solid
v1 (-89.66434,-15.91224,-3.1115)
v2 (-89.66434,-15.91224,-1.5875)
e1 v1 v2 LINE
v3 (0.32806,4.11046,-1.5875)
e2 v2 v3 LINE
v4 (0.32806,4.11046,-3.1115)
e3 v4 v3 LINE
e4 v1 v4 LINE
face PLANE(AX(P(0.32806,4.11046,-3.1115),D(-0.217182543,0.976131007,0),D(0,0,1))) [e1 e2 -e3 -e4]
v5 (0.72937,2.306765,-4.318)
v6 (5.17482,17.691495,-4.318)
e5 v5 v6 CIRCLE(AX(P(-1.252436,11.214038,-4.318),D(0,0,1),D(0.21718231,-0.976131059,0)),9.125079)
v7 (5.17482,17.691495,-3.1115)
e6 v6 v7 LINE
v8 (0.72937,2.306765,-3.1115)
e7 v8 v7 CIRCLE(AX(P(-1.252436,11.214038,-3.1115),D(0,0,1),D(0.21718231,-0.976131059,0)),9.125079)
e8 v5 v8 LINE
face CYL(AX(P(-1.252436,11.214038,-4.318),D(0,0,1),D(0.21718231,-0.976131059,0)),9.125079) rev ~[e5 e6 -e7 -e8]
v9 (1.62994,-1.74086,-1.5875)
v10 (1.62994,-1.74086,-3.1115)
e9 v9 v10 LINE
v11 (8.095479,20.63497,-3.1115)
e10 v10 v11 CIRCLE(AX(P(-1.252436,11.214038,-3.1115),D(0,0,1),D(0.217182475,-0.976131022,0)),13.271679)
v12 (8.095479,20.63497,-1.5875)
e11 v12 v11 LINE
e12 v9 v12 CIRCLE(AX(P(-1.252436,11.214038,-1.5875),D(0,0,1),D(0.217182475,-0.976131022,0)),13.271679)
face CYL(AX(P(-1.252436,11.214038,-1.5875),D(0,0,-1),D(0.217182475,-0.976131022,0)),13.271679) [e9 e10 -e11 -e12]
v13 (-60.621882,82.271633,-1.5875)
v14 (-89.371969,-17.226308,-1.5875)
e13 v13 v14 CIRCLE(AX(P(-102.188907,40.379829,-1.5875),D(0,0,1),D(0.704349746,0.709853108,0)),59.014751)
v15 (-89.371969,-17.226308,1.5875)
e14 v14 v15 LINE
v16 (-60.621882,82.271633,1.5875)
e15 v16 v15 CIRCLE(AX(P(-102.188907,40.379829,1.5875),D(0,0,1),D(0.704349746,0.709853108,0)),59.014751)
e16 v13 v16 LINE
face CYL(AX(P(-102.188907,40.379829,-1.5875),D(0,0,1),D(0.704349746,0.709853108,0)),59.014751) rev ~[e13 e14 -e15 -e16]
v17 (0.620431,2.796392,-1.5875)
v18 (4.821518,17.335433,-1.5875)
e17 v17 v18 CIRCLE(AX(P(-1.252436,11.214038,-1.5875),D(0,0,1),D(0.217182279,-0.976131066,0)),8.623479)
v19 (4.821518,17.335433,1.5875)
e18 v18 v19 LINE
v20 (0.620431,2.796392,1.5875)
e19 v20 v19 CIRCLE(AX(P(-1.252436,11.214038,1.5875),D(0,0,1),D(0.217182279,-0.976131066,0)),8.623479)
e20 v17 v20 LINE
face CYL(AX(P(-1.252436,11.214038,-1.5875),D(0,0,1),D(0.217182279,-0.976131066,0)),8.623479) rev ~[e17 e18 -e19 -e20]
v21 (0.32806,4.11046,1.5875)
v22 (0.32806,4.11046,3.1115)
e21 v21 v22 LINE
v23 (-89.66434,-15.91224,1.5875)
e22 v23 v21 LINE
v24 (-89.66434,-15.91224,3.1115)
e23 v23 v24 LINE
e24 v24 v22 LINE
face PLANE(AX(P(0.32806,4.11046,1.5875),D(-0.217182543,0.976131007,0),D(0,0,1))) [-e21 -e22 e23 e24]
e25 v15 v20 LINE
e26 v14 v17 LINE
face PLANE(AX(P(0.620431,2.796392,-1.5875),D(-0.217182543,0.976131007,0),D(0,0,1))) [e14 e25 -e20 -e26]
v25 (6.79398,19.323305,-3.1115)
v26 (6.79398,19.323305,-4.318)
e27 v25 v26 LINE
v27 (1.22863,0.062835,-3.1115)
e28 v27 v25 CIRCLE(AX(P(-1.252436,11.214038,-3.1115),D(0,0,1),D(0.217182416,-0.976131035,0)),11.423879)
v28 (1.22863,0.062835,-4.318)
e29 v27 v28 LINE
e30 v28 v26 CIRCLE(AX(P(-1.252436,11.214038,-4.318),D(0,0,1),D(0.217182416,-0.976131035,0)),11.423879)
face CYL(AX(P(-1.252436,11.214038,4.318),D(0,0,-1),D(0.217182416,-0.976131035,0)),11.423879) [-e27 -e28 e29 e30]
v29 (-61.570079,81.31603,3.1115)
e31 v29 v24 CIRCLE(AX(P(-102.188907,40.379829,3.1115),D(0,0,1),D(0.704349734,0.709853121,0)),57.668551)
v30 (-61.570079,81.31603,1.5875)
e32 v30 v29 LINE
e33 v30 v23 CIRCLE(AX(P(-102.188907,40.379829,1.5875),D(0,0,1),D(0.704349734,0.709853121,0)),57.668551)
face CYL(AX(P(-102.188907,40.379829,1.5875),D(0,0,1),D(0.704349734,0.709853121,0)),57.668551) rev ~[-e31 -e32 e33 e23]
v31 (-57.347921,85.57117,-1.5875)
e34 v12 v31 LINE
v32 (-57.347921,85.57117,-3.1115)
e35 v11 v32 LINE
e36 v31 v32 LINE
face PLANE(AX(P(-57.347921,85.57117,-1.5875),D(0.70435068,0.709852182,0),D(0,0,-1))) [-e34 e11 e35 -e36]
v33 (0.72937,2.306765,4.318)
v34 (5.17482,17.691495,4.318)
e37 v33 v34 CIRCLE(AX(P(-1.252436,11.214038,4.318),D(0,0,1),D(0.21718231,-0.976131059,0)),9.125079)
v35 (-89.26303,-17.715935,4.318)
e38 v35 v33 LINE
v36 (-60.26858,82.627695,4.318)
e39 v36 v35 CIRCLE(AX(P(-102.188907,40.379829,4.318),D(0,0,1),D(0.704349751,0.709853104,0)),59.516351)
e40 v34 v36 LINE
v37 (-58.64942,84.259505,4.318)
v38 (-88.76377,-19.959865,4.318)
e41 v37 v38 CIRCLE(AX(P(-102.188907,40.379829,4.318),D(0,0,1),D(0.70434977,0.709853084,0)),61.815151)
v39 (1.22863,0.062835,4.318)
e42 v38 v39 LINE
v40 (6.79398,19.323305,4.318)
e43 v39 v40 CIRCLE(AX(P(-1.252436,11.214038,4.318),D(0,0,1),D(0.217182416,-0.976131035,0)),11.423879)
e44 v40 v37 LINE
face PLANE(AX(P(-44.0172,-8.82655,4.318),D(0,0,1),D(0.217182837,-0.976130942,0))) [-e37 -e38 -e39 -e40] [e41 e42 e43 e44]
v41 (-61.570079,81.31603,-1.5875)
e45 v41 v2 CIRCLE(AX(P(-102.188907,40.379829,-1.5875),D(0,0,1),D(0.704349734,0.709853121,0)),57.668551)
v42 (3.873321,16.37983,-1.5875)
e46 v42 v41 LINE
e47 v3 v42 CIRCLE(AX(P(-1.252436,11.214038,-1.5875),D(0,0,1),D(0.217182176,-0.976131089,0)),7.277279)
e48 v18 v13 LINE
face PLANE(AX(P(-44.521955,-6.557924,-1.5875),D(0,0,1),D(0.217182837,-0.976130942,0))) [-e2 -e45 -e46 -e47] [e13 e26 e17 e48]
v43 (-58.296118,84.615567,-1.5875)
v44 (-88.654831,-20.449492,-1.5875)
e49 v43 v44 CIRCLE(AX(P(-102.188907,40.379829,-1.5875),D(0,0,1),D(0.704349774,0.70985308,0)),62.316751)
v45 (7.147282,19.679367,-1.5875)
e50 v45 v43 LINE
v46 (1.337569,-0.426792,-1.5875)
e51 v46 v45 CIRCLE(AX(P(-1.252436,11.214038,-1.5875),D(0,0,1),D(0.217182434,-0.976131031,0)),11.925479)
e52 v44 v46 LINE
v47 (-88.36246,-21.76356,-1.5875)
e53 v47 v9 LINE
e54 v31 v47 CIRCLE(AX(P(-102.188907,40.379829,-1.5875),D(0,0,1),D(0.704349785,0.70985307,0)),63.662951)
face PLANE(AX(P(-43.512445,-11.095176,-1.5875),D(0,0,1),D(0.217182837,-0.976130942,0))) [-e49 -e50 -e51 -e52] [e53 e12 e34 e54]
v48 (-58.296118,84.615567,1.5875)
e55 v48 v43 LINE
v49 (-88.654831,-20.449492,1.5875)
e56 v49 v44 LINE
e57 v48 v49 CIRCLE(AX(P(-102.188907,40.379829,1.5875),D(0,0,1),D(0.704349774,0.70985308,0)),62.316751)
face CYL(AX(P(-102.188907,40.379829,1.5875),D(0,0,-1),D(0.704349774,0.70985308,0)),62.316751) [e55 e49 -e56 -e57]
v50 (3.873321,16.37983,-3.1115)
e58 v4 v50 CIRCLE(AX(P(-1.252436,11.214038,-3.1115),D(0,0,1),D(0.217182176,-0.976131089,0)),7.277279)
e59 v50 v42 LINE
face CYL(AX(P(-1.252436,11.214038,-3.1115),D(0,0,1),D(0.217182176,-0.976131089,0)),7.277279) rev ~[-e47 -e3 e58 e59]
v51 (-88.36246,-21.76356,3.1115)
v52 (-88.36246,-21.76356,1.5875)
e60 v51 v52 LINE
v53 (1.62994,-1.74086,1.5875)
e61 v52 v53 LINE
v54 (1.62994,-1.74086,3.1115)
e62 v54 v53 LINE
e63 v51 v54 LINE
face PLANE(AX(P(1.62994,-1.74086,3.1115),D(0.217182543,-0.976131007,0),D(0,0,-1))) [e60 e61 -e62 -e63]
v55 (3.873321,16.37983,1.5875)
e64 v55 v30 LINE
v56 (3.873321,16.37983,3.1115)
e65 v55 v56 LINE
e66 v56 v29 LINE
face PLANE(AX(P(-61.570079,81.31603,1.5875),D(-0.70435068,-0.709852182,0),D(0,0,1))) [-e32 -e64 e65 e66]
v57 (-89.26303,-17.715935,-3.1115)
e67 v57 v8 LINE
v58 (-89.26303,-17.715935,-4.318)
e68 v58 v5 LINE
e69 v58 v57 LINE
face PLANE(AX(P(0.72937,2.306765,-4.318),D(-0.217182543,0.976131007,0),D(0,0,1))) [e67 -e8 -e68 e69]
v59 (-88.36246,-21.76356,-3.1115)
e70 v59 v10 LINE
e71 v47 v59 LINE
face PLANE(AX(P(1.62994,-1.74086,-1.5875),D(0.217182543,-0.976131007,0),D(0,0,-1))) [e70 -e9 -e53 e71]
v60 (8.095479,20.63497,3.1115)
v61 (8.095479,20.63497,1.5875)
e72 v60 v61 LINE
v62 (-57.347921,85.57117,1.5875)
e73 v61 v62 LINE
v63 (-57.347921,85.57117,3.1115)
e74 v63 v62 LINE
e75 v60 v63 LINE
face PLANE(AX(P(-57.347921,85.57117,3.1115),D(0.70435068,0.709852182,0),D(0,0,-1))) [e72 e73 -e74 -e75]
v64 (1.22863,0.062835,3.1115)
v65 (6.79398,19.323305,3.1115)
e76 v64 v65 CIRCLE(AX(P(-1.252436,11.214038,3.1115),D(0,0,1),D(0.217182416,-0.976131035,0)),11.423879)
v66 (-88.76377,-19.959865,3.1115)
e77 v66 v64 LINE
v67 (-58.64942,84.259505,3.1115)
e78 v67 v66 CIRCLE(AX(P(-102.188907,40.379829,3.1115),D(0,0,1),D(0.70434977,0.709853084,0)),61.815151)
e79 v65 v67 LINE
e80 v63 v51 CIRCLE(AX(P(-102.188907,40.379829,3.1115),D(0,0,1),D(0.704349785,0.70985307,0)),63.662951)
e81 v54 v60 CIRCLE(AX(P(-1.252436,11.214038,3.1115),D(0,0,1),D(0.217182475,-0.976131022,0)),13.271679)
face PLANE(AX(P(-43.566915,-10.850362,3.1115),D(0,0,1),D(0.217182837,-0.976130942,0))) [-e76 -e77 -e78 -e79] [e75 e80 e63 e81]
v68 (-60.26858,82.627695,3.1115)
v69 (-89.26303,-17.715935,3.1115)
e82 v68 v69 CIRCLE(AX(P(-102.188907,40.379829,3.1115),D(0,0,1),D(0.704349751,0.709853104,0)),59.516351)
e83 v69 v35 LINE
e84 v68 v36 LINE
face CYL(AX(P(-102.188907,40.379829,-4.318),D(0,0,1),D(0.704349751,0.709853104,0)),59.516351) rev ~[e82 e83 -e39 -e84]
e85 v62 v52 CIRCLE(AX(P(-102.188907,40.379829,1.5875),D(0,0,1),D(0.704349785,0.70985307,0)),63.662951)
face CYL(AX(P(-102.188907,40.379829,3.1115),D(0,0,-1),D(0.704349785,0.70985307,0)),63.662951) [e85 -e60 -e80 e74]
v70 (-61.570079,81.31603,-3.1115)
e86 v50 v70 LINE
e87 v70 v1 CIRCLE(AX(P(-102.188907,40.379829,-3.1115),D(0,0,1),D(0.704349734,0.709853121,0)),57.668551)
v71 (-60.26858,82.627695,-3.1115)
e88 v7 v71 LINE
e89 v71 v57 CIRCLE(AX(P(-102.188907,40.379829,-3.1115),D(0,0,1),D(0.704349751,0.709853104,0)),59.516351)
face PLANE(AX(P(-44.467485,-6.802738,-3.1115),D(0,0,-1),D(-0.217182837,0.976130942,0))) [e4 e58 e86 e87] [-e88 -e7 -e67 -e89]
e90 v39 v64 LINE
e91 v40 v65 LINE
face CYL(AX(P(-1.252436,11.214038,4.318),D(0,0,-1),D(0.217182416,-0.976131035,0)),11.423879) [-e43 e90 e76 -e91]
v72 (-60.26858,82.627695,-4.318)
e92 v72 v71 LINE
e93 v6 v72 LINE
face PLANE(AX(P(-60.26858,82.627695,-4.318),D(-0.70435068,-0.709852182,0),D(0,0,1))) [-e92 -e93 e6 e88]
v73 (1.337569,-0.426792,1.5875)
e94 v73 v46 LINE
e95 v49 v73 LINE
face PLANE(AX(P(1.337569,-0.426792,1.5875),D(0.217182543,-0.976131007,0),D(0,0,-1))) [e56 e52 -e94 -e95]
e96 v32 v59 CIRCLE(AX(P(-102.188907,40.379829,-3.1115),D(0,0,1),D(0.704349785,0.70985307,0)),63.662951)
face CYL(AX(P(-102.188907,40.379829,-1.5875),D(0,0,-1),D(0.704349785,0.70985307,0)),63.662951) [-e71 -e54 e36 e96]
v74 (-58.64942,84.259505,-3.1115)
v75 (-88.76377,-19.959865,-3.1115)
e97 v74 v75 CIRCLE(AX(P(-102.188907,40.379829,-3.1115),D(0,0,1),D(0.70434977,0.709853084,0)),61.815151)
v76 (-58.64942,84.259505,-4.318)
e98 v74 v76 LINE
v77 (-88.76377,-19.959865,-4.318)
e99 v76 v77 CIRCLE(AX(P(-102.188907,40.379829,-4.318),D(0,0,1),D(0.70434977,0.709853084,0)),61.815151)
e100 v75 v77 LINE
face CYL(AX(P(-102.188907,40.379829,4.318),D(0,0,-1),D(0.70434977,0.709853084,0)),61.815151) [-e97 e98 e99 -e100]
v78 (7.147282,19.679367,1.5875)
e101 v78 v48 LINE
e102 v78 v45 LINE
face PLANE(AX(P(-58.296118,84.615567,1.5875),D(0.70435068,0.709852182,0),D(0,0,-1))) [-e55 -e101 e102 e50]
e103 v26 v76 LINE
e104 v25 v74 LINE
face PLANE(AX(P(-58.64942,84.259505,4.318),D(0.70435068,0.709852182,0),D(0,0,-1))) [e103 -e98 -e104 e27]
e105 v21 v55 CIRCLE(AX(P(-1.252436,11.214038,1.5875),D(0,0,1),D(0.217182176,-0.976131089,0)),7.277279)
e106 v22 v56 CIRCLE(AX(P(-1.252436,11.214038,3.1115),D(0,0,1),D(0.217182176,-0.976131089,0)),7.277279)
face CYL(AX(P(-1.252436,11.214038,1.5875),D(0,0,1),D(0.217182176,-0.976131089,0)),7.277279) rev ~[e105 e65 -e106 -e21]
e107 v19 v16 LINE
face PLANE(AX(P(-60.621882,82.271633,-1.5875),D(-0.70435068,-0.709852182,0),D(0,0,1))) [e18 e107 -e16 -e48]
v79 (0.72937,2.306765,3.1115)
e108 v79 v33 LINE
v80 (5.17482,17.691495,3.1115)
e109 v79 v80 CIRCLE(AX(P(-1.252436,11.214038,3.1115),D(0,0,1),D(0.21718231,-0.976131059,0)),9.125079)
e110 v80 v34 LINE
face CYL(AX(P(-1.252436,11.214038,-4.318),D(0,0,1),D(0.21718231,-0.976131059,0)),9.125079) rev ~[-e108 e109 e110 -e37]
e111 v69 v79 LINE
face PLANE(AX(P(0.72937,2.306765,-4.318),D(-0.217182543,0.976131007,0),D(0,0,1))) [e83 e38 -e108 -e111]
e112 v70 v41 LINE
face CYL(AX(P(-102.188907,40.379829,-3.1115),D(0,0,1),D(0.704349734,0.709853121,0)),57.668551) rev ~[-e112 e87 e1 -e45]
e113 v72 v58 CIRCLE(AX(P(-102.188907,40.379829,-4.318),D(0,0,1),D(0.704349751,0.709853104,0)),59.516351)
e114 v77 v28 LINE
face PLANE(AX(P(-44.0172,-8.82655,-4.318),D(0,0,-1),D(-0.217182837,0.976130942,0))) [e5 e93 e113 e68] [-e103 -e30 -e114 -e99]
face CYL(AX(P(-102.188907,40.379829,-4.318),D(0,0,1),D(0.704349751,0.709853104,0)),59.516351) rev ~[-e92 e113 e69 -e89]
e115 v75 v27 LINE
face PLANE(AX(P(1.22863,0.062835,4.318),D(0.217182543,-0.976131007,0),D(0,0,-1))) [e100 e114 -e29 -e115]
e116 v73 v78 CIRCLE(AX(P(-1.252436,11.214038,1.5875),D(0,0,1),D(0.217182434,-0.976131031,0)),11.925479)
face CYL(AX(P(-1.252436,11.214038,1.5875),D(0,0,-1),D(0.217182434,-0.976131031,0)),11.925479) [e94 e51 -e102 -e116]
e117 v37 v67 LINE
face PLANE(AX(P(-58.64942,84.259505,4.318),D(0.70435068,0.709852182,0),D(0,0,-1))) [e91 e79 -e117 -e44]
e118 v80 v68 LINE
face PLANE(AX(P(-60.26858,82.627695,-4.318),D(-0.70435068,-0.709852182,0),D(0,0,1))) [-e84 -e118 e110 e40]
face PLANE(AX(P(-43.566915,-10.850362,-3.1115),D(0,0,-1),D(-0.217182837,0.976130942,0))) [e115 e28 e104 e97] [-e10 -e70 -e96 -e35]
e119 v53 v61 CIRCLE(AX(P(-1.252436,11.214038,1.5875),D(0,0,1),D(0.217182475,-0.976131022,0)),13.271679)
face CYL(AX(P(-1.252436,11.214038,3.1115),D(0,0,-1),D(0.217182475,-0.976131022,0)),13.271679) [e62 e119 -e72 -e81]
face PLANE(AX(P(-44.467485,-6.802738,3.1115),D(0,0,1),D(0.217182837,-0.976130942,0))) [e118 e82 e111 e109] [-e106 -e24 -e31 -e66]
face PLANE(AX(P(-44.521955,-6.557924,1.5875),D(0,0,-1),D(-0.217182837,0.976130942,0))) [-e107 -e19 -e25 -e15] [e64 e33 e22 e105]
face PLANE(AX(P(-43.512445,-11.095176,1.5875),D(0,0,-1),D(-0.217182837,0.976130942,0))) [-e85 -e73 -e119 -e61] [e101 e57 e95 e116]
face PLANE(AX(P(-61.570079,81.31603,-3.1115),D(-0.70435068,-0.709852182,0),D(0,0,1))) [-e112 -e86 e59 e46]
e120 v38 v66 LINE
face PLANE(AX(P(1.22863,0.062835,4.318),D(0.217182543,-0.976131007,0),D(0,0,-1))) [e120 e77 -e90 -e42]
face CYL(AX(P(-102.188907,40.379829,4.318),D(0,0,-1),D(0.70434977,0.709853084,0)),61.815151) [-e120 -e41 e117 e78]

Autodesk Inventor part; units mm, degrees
ref_plane "Work Plane2" through (-1.2524, 11.214, 0) normal (-1, 0, 0) x (0, 0, 1)
ref_plane "Work Plane3" through (-102.1889, 40.3798, 0) normal (0.9912773, 0.1317925, 0) x (0, 0, 1)
sketch "Path" plane through (0, 0, 0) normal (0, 0, 1) x (1, 0, 0)
  arc A0 (0.979, 1.1848) -> (5.9844, 18.5074) centre (-1.2524, 11.214) ccw
  arc A1 (-59.459, 83.4436) -> (-89.0134, -18.8379) centre (-102.1889, 40.3798) ccw
  line L0 (-59.459, 83.4436) -> (5.9844, 18.5074)
  line L1 (0.979, 1.1848) -> (-89.0134, -18.8379)
  dimension "d31" = 5.9944
ref_plane "Section Plane" through (5.9844, 18.5074, 0) normal (-0.7098526, 0.7043503, 0) x (0, 0, 1)
sketch "Section Sketch" plane through (5.9844, 18.5074, 0) normal (-0.7098526, 0.7043503, 0) x (0, 0, 1)
  line L0 (-4.318, -1.1494) -> (4.318, -1.1494)
  line L1 (4.318, -1.1494) -> (4.318, 1.1494)
  line L2 (4.318, 1.1494) -> (-4.318, 1.1494)
  line L3 (-4.318, 1.1494) -> (-4.318, -1.1494)
  line L4 (-1.5875, -1.651) -> (1.5875, -1.651)
  line L5 (1.5875, -1.651) -> (1.5875, 1.651)
  line L6 (1.5875, 1.651) -> (-1.5875, 1.651)
  line L7 (-1.5875, 1.651) -> (-1.5875, -1.651)
  line L8 (-1.5875, 0) -> (1.5875, 0) construction
  line L9 (-3.1115, -2.9972) -> (-1.5875, -2.9972)
  line L10 (-1.5875, -2.9972) -> (-1.5875, 2.9972)
  line L11 (-1.5875, 2.9972) -> (-3.1115, 2.9972)
  line L12 (-3.1115, 2.9972) -> (-3.1115, -2.9972)
  line L13 (1.5875, -2.9972) -> (3.1115, -2.9972)
  line L14 (3.1115, -2.9972) -> (3.1115, 2.9972)
  line L15 (3.1115, 2.9972) -> (1.5875, 2.9972)
  line L16 (1.5875, 2.9972) -> (1.5875, -2.9972)
  line L17 (-4.318, 0) -> (4.318, 0) construction
  point P0 (0, 0)
  point P1 (0, 0)
  dimension "d21" = 2.2987
  dimension "d22" = 3.302
  dimension "d23" = 3.175
  dimension "d24" = 1.524
  dimension "d31" = 5.9944
  dimension "d32" = 8.636
sweep "Solid" add profiles "Section Sketch" path "Path"
pattern_of_one "Strand Pattern"
equation "\"d21\" = da_d2"
equation "\"d22\" = da_d1"
equation "\"d23\" = da_b1"
equation "\"d24\" = da_t1 + da_t2"
equation "\"d30\" = da_pt"
equation "\"da_p\" = 6.35"
equation "\"da_b1\" = 3.175"
equation "\"da_h2\" = 5.9944"
equation "\"da_h3\" = 5.207"
equation "\"da_d1\" = 3.302"
equation "\"da_d2\" = 2.2987"
equation "\"da_pt\" = 6.4008"
equation "\"da_b\" = 8.636"
equation "\"da_t1\" = 0.762"
equation "\"da_t2\" = 0.762"
properties part number "Roller Chain"
